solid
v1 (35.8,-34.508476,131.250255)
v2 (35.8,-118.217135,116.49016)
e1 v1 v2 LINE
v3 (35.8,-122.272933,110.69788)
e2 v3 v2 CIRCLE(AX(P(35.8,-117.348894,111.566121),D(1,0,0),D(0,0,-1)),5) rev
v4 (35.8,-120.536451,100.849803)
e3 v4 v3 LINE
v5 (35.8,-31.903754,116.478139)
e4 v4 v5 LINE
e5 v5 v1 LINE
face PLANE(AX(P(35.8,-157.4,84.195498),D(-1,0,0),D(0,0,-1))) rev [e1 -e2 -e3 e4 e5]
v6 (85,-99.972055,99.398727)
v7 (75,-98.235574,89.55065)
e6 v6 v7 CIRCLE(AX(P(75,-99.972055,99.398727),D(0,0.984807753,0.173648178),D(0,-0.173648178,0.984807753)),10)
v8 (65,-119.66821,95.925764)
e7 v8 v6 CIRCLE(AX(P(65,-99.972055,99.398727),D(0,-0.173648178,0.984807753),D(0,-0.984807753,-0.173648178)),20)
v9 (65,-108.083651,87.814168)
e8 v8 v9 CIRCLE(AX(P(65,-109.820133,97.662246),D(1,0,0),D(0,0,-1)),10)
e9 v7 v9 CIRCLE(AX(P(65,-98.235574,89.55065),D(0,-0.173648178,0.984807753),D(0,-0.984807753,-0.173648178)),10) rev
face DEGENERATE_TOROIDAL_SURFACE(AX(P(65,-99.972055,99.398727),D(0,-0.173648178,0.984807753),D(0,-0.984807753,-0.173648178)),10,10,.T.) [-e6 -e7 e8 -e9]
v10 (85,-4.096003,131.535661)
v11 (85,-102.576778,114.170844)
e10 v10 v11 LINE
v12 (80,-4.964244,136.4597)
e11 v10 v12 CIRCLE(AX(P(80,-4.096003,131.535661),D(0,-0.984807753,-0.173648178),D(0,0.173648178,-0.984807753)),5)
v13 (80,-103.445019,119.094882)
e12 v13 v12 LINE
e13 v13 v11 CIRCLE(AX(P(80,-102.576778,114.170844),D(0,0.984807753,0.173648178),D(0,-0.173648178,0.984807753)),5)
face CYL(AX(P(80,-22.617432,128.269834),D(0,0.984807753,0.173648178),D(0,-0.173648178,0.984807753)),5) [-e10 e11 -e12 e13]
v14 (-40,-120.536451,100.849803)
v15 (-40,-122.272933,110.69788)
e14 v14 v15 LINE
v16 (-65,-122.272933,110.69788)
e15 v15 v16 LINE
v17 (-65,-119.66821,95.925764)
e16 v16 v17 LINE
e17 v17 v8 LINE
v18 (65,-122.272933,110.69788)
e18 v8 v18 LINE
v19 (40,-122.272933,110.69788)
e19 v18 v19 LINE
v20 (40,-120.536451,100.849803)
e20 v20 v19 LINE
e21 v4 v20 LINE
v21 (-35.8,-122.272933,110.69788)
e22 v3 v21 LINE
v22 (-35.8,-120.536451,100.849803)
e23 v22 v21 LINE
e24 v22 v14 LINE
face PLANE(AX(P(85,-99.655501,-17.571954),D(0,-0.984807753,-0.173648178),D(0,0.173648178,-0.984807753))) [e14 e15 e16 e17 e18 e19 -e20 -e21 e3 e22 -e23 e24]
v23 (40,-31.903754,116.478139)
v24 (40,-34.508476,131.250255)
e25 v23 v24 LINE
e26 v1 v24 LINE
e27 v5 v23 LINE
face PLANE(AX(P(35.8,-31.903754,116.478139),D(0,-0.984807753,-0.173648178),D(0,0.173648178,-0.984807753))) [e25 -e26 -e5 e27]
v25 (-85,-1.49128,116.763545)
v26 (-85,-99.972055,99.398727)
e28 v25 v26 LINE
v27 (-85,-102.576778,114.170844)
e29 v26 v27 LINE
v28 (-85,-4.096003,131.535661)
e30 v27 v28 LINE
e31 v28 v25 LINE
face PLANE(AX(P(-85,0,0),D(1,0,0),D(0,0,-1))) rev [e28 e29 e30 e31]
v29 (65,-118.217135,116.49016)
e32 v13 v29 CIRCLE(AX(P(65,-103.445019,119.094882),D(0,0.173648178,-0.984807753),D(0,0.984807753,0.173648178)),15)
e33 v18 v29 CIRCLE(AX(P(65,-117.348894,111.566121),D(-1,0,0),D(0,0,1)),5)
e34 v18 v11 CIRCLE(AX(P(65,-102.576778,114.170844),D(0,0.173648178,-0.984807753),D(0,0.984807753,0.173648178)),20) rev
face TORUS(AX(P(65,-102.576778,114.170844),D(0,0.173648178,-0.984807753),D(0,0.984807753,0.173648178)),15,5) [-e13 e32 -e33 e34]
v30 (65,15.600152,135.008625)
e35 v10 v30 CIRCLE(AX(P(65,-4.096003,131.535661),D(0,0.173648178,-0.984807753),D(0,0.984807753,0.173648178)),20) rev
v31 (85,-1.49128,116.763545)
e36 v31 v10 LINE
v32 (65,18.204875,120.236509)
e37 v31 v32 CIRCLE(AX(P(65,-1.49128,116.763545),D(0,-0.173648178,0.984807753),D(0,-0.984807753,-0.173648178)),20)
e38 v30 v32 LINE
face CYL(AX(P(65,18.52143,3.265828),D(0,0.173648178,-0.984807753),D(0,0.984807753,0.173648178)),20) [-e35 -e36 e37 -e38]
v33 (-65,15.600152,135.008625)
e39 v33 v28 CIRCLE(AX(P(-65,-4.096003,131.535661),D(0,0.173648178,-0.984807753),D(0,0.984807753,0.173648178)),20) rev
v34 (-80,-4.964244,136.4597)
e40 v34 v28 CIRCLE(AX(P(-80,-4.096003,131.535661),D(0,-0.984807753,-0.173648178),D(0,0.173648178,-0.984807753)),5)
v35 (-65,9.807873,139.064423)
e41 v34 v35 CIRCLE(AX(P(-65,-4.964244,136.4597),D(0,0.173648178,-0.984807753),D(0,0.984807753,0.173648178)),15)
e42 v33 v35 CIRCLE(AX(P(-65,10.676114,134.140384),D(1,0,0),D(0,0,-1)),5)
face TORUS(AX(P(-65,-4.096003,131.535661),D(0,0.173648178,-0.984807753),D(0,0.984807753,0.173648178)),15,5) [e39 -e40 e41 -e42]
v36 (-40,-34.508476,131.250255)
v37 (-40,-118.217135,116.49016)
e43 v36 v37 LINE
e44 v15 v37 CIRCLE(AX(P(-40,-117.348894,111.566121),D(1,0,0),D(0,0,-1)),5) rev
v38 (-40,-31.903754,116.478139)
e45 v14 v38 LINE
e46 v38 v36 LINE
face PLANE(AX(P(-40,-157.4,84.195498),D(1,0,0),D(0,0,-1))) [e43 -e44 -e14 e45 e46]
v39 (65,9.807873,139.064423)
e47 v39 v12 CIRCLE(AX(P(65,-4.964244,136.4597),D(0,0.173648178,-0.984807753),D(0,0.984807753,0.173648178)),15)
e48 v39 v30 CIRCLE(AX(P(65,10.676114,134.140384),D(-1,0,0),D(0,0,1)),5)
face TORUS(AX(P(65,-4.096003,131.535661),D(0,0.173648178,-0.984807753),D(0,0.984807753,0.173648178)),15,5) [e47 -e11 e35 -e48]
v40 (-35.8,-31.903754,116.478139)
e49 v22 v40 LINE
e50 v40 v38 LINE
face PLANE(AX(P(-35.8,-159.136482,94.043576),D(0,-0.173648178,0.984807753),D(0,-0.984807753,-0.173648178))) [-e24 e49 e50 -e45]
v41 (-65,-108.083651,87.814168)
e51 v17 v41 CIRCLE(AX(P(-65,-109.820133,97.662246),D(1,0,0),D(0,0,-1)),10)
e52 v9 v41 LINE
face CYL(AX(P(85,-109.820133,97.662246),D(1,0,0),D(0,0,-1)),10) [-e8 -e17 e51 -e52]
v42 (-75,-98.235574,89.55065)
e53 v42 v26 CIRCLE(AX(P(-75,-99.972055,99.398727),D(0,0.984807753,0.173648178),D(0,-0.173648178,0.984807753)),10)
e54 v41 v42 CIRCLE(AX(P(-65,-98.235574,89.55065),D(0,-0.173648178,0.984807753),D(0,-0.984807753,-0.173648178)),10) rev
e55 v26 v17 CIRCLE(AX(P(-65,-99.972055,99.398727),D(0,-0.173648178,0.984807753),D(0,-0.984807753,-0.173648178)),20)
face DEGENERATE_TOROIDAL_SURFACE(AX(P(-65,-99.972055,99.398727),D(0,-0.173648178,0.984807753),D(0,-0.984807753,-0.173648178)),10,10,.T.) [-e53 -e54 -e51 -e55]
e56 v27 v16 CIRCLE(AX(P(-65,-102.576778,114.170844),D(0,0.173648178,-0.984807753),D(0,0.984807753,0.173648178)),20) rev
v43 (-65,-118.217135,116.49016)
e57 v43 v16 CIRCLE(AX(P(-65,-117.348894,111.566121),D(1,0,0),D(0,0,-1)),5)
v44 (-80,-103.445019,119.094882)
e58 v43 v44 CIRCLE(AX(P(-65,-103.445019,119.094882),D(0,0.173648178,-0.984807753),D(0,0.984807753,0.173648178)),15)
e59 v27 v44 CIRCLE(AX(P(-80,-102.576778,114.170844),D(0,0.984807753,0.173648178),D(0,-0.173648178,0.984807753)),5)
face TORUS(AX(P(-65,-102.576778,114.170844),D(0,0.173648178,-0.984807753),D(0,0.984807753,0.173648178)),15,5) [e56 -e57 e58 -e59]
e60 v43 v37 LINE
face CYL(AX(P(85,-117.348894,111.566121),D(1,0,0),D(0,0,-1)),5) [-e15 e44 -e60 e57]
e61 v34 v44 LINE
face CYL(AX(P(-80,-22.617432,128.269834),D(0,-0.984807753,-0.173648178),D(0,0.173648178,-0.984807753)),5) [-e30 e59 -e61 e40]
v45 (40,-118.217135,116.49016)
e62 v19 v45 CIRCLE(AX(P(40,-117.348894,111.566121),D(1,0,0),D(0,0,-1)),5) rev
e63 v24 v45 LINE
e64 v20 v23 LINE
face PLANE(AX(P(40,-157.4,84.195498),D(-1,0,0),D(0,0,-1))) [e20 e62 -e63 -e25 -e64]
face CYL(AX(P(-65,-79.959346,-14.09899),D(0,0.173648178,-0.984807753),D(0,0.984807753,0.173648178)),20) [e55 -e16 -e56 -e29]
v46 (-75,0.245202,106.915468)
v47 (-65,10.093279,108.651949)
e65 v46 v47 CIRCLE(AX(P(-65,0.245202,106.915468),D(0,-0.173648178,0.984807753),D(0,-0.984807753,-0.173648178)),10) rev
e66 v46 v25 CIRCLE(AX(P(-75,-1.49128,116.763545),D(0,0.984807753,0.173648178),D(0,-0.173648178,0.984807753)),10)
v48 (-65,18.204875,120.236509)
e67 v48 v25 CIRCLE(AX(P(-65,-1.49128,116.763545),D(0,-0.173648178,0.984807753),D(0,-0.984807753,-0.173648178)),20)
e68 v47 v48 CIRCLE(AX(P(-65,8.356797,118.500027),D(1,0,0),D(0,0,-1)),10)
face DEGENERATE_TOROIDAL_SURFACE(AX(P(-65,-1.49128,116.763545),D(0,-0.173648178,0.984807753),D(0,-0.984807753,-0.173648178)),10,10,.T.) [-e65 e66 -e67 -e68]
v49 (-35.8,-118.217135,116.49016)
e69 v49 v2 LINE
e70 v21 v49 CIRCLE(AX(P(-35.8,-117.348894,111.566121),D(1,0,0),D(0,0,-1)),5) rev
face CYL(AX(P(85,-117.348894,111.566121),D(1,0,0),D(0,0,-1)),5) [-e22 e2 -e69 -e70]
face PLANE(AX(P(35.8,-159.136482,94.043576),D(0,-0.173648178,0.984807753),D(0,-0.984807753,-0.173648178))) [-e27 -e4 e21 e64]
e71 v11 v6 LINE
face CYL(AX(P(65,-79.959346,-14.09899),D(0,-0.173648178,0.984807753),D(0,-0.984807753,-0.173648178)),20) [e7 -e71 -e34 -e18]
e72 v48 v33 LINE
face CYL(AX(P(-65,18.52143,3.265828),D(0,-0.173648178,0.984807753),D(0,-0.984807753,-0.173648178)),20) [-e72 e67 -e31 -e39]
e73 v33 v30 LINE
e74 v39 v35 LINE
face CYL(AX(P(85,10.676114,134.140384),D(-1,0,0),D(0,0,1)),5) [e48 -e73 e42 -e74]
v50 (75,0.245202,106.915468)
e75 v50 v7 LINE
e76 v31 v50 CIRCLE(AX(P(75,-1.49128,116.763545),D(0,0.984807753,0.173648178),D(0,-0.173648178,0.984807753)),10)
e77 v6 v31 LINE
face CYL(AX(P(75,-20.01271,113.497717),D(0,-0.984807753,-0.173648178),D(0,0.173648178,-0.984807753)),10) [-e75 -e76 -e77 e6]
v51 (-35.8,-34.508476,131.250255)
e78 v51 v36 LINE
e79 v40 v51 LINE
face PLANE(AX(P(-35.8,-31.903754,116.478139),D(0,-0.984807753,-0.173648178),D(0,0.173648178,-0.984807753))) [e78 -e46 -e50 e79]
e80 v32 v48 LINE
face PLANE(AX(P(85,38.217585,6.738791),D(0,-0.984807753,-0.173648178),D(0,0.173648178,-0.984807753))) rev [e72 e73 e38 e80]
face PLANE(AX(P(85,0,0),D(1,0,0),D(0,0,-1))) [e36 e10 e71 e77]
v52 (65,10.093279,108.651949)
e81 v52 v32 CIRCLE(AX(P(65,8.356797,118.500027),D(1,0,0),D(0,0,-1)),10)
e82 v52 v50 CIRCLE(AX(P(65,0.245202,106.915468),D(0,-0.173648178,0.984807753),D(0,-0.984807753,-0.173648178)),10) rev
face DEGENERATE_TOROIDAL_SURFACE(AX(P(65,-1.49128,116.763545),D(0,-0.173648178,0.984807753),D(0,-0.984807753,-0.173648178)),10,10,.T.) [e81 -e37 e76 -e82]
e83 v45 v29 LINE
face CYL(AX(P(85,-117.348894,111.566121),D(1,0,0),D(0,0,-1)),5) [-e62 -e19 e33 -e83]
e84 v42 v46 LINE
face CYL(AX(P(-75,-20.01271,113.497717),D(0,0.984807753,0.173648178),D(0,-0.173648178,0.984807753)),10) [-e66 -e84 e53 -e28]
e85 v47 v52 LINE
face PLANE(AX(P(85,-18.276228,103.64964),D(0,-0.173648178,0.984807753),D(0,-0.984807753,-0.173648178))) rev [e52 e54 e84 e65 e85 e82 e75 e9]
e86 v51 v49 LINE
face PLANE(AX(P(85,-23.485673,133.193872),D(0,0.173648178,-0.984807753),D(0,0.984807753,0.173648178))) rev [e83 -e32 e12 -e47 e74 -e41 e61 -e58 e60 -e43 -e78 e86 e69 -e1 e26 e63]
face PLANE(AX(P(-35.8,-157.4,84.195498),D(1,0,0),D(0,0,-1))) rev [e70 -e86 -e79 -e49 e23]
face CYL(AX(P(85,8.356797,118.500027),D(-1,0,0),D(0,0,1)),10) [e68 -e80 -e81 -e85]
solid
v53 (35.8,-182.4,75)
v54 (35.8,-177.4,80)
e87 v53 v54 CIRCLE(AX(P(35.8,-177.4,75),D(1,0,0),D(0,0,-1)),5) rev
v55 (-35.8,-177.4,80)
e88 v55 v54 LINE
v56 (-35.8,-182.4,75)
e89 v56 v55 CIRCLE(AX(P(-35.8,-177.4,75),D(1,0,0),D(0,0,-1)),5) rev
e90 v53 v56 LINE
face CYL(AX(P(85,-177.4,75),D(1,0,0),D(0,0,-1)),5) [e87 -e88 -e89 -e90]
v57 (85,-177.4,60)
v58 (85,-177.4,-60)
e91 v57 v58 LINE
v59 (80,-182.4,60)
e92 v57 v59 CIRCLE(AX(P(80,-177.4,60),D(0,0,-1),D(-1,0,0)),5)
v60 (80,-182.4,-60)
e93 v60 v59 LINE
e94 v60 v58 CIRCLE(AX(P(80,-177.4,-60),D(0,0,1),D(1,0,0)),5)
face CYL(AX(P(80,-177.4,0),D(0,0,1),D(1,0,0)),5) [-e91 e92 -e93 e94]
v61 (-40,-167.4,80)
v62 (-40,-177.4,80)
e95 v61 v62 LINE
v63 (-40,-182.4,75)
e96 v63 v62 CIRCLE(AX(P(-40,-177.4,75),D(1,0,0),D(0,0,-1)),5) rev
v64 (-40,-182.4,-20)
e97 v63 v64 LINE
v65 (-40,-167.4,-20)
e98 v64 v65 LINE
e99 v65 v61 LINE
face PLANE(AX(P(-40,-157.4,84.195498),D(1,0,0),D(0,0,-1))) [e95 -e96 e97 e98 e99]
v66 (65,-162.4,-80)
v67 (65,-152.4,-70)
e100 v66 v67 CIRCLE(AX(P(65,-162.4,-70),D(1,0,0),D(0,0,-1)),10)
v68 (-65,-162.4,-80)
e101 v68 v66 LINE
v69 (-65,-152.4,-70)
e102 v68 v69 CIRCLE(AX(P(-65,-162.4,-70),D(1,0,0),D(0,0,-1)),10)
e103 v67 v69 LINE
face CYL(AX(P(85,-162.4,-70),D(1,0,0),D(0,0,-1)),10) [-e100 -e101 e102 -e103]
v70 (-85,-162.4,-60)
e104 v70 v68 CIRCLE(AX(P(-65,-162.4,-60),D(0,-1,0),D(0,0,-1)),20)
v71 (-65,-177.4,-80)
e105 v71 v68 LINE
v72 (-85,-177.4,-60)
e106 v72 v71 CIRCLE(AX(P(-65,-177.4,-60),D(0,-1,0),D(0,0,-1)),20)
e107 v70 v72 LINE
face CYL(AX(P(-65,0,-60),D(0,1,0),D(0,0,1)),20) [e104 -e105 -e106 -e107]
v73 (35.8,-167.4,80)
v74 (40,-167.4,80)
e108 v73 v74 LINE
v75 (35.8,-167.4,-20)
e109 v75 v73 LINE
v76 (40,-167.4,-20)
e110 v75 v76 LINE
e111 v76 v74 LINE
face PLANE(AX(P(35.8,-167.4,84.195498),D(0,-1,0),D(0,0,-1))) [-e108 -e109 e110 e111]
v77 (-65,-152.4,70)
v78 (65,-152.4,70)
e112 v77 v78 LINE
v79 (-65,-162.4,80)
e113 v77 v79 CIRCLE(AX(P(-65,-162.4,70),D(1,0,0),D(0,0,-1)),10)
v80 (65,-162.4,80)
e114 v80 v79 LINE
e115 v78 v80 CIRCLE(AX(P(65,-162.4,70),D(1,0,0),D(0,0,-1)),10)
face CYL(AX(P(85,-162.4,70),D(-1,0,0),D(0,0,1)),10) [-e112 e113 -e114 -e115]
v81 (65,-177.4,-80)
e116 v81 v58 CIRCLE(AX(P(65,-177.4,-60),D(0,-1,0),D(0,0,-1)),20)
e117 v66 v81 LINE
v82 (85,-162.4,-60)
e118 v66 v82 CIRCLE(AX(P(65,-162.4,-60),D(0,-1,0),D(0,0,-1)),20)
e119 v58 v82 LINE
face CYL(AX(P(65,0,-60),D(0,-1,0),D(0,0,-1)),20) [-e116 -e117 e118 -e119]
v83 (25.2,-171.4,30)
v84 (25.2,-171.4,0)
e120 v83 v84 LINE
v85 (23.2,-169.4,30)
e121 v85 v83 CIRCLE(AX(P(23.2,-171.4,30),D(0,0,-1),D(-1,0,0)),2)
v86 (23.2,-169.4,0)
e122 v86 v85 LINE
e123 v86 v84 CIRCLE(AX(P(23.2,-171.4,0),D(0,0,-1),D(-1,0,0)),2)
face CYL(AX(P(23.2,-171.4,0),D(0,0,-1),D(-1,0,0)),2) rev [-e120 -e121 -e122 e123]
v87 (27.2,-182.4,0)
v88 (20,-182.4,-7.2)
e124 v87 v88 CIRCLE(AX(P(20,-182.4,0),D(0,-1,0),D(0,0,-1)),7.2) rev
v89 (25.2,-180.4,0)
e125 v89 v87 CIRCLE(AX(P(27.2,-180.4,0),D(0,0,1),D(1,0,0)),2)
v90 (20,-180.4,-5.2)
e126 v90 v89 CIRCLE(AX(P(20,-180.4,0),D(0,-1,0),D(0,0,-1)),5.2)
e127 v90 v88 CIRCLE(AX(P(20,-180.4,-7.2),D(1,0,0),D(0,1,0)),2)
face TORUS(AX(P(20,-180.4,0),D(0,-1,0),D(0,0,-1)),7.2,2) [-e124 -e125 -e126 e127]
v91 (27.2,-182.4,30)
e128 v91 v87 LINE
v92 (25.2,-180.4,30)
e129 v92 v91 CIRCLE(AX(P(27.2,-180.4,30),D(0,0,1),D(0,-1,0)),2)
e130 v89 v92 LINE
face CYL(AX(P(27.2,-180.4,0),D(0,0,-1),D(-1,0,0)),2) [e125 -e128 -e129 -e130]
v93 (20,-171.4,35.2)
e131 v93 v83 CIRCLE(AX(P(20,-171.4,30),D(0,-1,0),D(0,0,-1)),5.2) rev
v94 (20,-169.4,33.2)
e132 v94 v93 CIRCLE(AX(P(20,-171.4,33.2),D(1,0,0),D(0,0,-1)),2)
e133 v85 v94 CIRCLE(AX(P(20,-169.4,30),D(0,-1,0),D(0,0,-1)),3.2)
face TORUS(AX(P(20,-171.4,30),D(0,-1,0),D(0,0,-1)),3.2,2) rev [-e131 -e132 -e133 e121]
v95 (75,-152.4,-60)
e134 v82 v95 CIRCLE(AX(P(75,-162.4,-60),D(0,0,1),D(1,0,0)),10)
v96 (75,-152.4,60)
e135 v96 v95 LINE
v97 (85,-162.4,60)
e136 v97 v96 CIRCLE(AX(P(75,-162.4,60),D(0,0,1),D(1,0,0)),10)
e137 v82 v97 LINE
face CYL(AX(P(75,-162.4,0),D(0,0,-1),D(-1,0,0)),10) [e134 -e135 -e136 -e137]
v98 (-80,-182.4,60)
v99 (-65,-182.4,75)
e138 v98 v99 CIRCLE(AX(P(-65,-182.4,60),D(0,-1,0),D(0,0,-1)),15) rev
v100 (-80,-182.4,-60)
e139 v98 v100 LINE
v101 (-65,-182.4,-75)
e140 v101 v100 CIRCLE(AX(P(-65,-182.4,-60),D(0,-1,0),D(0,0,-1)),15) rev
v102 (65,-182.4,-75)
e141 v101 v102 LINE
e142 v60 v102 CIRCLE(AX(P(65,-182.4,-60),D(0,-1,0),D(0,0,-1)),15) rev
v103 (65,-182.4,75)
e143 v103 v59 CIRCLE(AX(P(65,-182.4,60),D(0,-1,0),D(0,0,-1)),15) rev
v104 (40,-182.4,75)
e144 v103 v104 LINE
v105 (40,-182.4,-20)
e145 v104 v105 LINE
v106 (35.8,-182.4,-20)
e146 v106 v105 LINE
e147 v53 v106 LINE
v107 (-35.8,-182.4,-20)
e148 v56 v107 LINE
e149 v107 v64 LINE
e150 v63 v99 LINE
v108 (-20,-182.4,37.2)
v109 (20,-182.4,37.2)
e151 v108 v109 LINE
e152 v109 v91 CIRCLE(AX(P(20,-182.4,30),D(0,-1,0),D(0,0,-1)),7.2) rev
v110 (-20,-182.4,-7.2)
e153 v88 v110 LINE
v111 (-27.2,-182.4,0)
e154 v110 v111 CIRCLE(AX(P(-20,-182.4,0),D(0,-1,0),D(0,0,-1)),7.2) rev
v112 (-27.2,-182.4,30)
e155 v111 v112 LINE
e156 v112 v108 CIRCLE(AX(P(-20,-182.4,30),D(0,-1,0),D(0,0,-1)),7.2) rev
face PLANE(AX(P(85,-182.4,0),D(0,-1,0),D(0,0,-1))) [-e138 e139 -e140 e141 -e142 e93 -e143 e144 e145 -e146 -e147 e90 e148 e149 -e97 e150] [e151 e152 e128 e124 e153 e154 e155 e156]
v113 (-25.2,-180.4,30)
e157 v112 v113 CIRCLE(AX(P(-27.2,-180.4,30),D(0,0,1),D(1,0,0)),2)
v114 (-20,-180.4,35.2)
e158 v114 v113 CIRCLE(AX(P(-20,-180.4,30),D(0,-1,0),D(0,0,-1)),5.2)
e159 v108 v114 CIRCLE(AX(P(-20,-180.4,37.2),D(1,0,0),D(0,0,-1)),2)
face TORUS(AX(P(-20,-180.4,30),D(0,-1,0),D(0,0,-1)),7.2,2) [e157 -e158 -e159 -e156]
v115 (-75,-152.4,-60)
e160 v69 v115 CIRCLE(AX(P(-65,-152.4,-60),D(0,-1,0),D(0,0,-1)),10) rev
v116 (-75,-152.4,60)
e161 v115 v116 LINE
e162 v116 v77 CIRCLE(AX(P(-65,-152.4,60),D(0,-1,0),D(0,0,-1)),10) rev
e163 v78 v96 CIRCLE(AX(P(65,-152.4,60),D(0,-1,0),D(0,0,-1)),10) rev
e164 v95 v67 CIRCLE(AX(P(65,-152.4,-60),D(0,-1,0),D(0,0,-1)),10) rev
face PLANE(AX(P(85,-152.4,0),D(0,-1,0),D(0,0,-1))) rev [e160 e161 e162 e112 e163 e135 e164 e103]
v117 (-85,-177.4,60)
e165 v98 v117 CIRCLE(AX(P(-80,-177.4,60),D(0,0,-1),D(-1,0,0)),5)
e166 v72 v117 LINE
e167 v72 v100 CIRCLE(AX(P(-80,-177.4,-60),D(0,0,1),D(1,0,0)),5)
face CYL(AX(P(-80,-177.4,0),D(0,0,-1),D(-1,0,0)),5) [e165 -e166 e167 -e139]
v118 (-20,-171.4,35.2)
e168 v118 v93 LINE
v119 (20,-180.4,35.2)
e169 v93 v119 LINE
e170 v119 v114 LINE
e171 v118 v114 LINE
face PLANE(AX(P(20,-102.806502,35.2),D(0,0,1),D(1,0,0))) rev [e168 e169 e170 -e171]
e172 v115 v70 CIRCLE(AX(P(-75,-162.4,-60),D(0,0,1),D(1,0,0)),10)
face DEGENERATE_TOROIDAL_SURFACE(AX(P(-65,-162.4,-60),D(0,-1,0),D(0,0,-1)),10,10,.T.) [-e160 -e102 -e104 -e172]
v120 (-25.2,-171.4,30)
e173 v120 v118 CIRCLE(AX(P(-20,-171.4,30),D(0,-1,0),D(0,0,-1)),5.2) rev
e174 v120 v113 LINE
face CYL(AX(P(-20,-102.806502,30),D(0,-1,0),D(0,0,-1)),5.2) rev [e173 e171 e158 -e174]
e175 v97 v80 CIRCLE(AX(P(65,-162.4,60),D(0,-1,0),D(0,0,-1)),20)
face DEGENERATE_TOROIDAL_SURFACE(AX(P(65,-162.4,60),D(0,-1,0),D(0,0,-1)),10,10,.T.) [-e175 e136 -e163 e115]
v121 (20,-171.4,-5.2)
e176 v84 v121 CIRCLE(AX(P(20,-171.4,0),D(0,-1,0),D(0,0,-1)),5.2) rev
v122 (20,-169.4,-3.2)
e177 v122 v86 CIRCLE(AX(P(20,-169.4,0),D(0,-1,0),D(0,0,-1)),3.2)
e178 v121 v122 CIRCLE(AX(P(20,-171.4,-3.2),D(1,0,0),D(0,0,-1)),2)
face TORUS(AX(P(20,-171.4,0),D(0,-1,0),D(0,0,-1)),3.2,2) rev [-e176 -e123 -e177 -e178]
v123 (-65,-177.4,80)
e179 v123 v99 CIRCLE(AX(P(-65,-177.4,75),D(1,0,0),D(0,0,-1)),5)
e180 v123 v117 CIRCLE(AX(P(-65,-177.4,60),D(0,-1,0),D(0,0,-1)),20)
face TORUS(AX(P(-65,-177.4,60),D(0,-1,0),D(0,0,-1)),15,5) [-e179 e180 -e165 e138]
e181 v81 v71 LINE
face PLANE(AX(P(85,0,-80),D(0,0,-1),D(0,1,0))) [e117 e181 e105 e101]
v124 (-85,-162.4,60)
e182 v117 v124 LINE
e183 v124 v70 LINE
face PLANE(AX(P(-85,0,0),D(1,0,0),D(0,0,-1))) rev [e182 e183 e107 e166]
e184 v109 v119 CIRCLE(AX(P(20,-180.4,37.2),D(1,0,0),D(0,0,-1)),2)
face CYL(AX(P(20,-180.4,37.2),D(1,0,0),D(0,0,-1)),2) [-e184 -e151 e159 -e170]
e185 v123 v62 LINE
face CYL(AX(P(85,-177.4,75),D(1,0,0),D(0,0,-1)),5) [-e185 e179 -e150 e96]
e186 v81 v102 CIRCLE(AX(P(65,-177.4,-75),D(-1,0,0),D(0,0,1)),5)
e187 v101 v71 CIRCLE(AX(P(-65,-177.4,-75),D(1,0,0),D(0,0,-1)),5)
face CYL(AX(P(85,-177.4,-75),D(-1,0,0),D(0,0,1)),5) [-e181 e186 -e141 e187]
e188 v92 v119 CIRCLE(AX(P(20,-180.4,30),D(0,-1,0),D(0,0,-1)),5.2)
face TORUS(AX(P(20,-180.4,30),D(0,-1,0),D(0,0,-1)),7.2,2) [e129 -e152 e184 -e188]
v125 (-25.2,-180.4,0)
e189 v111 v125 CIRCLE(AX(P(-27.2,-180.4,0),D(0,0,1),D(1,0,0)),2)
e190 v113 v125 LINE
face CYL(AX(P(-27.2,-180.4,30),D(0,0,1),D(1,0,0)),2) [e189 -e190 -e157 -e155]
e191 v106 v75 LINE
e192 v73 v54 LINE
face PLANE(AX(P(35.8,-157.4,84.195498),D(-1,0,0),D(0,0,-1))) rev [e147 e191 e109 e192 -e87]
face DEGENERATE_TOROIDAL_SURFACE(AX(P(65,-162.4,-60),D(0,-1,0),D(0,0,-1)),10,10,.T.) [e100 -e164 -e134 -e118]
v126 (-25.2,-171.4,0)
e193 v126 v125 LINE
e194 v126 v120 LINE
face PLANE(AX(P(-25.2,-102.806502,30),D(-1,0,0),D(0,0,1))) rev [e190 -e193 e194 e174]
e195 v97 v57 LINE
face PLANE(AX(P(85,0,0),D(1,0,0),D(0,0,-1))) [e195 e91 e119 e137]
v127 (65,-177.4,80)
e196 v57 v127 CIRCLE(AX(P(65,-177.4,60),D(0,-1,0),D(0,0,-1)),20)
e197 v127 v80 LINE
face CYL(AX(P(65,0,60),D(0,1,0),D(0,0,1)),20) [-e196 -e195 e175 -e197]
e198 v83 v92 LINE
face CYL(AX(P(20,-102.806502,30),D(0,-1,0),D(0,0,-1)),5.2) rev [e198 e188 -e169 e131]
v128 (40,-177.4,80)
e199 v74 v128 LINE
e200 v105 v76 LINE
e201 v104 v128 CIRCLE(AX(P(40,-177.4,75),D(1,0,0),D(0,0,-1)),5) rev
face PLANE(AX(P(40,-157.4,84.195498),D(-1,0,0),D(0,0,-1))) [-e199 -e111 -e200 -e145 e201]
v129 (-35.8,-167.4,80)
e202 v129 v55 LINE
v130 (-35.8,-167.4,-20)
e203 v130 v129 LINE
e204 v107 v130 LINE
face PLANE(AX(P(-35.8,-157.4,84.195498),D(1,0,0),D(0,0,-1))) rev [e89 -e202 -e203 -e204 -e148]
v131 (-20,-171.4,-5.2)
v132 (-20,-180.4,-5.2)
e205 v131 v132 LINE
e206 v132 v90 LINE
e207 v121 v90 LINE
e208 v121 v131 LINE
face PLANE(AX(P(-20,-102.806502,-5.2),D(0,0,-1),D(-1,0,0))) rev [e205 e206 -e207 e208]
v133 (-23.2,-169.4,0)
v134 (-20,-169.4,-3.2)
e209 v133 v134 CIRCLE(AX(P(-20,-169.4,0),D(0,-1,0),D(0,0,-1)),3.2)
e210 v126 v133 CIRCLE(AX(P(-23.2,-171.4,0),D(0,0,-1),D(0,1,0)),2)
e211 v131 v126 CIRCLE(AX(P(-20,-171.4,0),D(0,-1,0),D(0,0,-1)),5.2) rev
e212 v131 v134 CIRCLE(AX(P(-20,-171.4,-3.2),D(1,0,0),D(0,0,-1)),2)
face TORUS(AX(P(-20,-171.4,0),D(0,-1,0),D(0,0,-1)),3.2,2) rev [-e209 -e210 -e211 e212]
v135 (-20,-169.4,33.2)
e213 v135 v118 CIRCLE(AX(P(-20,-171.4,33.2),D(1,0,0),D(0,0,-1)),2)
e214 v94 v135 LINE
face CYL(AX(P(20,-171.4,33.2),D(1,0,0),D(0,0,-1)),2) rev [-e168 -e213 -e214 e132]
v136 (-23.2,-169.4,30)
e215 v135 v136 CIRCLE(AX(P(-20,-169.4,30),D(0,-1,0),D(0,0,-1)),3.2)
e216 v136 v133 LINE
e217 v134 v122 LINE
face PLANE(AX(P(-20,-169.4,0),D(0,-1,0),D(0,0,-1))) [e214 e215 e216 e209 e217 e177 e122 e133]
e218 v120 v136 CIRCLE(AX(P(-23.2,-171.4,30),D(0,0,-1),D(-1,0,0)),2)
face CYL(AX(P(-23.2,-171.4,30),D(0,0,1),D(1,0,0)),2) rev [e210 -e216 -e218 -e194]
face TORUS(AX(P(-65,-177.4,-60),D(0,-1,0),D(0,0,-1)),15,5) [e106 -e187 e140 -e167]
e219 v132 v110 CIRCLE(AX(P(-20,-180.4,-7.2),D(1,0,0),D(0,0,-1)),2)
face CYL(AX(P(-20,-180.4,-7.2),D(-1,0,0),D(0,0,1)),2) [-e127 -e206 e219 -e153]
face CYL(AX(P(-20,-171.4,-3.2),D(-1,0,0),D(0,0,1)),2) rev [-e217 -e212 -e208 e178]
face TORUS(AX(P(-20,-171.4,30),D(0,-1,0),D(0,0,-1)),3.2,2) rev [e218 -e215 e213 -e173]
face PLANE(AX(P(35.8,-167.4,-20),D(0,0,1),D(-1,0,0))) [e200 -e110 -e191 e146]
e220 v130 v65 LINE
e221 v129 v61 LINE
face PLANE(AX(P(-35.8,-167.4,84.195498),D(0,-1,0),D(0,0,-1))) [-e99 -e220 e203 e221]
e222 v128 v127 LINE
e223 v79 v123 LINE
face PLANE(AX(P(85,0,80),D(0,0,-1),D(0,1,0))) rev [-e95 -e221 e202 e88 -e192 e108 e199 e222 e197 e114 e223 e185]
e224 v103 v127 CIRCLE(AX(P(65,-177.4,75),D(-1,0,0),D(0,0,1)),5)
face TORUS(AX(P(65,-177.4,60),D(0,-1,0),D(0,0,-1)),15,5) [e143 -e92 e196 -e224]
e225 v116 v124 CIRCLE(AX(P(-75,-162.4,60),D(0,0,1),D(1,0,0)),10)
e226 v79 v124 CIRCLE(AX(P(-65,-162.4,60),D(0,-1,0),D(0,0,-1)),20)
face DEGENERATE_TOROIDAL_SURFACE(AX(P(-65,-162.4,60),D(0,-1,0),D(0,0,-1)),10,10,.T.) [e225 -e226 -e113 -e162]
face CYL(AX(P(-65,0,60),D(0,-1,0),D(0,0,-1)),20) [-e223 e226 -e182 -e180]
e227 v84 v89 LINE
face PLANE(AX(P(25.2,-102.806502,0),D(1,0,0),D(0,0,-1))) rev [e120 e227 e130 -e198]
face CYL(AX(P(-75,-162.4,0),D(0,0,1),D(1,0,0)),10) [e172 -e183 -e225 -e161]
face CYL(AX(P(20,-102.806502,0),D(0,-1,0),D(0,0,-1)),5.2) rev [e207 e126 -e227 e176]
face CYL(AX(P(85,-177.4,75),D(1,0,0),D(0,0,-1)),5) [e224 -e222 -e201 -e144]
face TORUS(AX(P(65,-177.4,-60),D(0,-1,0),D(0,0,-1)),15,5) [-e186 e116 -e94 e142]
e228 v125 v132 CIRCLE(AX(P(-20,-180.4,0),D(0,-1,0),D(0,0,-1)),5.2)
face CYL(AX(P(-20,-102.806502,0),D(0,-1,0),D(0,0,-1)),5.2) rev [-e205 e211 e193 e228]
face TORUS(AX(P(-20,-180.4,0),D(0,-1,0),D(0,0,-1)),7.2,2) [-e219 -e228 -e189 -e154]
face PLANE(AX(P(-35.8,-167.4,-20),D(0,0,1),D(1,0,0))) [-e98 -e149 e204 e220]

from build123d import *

# Parameters (mm, degrees)
SKETCH1_W           = 160
SKETCH1_H           = 30
BOSS_EXTRUDE1_DEPTH = 85
FILLET5_R           = 5
FILLET6_R           = 5
CUT_EXTRUDE1_START  = -40
CUT_EXTRUDE1_DEPTH  = 4.2
FILLET1_R           = 20
FILLET2_R           = 20
FILLET3_R           = 10
FILLET4_R           = 10
CUT_EXTRUDE3_DEPTH  = 13
FILLET7_R           = 2


with BuildPart() as part:
    # Sketch1 → Boss-Extrude1 (new, symmetric)
    with BuildSketch(Plane(origin=(0, 0, 0), x_dir=(0, 0, -1), z_dir=(1, 0, 0))):
        with Locations((0, -167.4)):
            Rectangle(SKETCH1_W, SKETCH1_H)
        Polygon((-136.5722642, -4.325861041), (-131.250254799, -34.508476203), (-116.478138504, -31.903753538), (-100.849802514, -120.53645131), (-86.077686218, -117.931728645), (-110.388431092, 19.941356777), (-139.932663682, 14.731911447), align=None)
        Polygon((-131.250254799, -34.508476203), (-115.621918809, -123.141173975), (-100.849802514, -120.53645131), (-116.478138504, -31.903753538), align=None)
    extrude(amount=BOSS_EXTRUDE1_DEPTH, both=True)

    # Fillet5
    fillet5_edges = [part.edges().sort_by_distance(p)[0] for p in [
        (0, -123.141173975, 115.621918809),
        (85, -54.204631264, 127.777291245),
        (-85, -54.204631264, 127.777291245),
        (0, 14.731911447, 139.932663682),
    ]]
    fillet(fillet5_edges, radius=FILLET5_R)

    # Fillet6
    fillet6_edges = [part.edges().sort_by_distance(p)[0] for p in [
        (85, -182.4, 0),
        (-85, -182.4, 0),
        (0, -182.4, 80),
        (0, -182.4, -80),
    ]]
    fillet(fillet6_edges, radius=FILLET6_R)

    # Sketch2 → Cut-Extrude1 (cut)
    with BuildSketch(Plane(origin=(0, 0, 0), x_dir=(0, 0, -1), z_dir=(1, 0, 0)).offset(CUT_EXTRUDE1_START)):
        with BuildLine():
            Line((-131.250254799, -34.508476203), (-108.815691981, -161.741204442))
            ThreePointArc((-108.815691981, -161.741204442), (-100.265188398, -176.551111078), (-84.195498156, -182.4))
            Line((-84.195498156, -182.4), (-80, -182.4))
            Line((-80, -182.4), (20, -182.4))
            Line((20, -182.4), (20, -167.4))
            Line((20, -167.4), (-80, -167.4))
            Line((-80, -167.4), (-84.195498156, -167.4))
            ThreePointArc((-84.195498156, -167.4), (-90.623374253, -165.060444431), (-94.043575686, -159.136481777))
            Line((-94.043575686, -159.136481777), (-116.478138504, -31.903753538))
            Line((-116.478138504, -31.903753538), (-131.250254799, -34.508476203))
        make_face()
    cut_extrude1 = extrude(amount=CUT_EXTRUDE1_DEPTH, mode=Mode.SUBTRACT)

    # Mirror1: Cut-Extrude1 across plane
    add(cut_extrude1.mirror(Plane(origin=(0, 0, 0), x_dir=(0, 0, 1), z_dir=(1, 0, 0))), mode=Mode.SUBTRACT)

    # Fillet1
    # the kernel refuses this fillet: 20 mm, written as the material it takes off along each edge
    with BuildSketch(Plane(origin=(65, -182.4, -60), x_dir=(0, 0, -1), z_dir=(-1, 0, 0))) as fillet1_piece_1:
        with BuildLine():
            CenterArc((15, -5), 5, 0, 90)
            Line((20, -5), (20, 0))
            Line((20, 0), (15, 0))
        make_face()
    revolve(axis=Axis((65, -182.4, -60), (0, -1, 0)), revolution_arc=90, mode=Mode.SUBTRACT)
    with BuildSketch(Plane(origin=(-65, -182.4, -60), x_dir=(-1, 0, 0), z_dir=(0, 0, 1))) as fillet1_piece_2:
        with BuildLine():
            CenterArc((15, -5), 5, 0, 90)
            Line((20, -5), (20, 0))
            Line((20, 0), (15, 0))
        make_face()
    revolve(axis=Axis((-65, -182.4, -60), (0, -1, 0)), revolution_arc=90, mode=Mode.SUBTRACT)
    with BuildSketch(Plane(origin=(65, -182.4, 60), x_dir=(1, 0, 0), z_dir=(0, 0, -1))) as fillet1_piece_3:
        with BuildLine():
            CenterArc((15, -5), 5, 0, 90)
            Line((20, -5), (20, 0))
            Line((20, 0), (15, 0))
        make_face()
    revolve(axis=Axis((65, -182.4, 60), (0, -1, 0)), revolution_arc=90, mode=Mode.SUBTRACT)
    with BuildSketch(Plane(origin=(-65, -182.4, 60), x_dir=(0, 0, 1), z_dir=(1, 0, 0))) as fillet1_piece_4:
        with BuildLine():
            CenterArc((15, -5), 5, 0, 90)
            Line((20, -5), (20, 0))
            Line((20, 0), (15, 0))
        make_face()
    revolve(axis=Axis((-65, -182.4, 60), (0, -1, 0)), revolution_arc=90, mode=Mode.SUBTRACT)
    with BuildSketch(Plane(origin=(85, -102.4, -80), x_dir=(0, 0, 1), z_dir=(0, -1, 0)), Plane(origin=(85, -182.4, 80), x_dir=(0, 0, -1), z_dir=(0, 1, 0)), Plane(origin=(-85, -182.4, 80), x_dir=(1, 0, 0), z_dir=(0, 1, 0))) as fillet1_piece_5:
        with BuildLine():
            CenterArc((FILLET1_R, FILLET1_R), FILLET1_R, 180, 90)
            Line((0, FILLET1_R), (0, 0))
            Line((0, 0), (FILLET1_R, 0))
        make_face()
    extrude(amount=80, mode=Mode.SUBTRACT)
    with BuildSketch(Plane(origin=(-85, -102.4, -80), x_dir=(0, 0, 1), z_dir=(0, -1, 0))) as fillet1_piece_6:
        with BuildLine():
            CenterArc((FILLET1_R, -FILLET1_R), FILLET1_R, 90, 90)
            Line((0, -FILLET1_R), (0, 0))
            Line((0, 0), (FILLET1_R, 0))
        make_face()
    extrude(amount=80, mode=Mode.SUBTRACT)

    # Fillet2
    # the kernel refuses this fillet: 20 mm, written as the material it takes off along each edge
    with BuildSketch(Plane(origin=(65, -103.445018914, 119.094882362), x_dir=(0, -0.9848077530122086, -0.17364817766692728), z_dir=(-1, 0, 0))) as fillet2_piece_1:
        with BuildLine():
            CenterArc((15, -5), 5, 0, 90)
            Line((20, -5), (20, 0))
            Line((20, 0), (15, 0))
        make_face()
    revolve(axis=Axis((65, -103.445018914, 119.094882362), (0, -0.17364817766692778, 0.9848077530122086)), revolution_arc=90, mode=Mode.SUBTRACT)
    with BuildSketch(Plane(origin=(-65, -103.445018914, 119.094882362), x_dir=(-1, 0, 0), z_dir=(0, 0.9848077530122086, 0.17364817766692778))) as fillet2_piece_2:
        with BuildLine():
            CenterArc((15, -5), 5, 0, 90)
            Line((20, -5), (20, 0))
            Line((20, 0), (15, 0))
        make_face()
    revolve(axis=Axis((-65, -103.445018914, 119.094882362), (0, -0.17364817766692778, 0.9848077530122086)), revolution_arc=90, mode=Mode.SUBTRACT)
    with BuildSketch(Plane(origin=(65, -4.964243613, 136.459700129), x_dir=(1, 0, 0), z_dir=(0, -0.9848077530122086, -0.17364817766692778))) as fillet2_piece_3:
        with BuildLine():
            CenterArc((15, -5), 5, 0, 90)
            Line((20, -5), (20, 0))
            Line((20, 0), (15, 0))
        make_face()
    revolve(axis=Axis((65, -4.964243613, 136.459700129), (0, -0.17364817766692778, 0.9848077530122086)), revolution_arc=90, mode=Mode.SUBTRACT)
    with BuildSketch(Plane(origin=(-65, -4.964243613, 136.459700129), x_dir=(0, 0.9848077530122086, 0.17364817766692744), z_dir=(1, 0, 0))) as fillet2_piece_4:
        with BuildLine():
            CenterArc((15, -5), 5, 0, 90)
            Line((20, -5), (20, 0))
            Line((20, 0), (15, 0))
        make_face()
    revolve(axis=Axis((-65, -4.964243613, 136.459700129), (0, -0.17364817766692778, 0.9848077530122086)), revolution_arc=90, mode=Mode.SUBTRACT)
    with BuildSketch(Plane(origin=(85, -123.141173975, 115.621918809), x_dir=(0, 0.9848077530122087, 0.17364817766692744), z_dir=(0, 0.17364817766692744, -0.9848077530122086)), Plane(origin=(-85, 28.62376566, 61.148043441), x_dir=(1, 0, 0), z_dir=(0, -0.17364817766692744, 0.9848077530122086))) as fillet2_piece_5:
        with BuildLine():
            CenterArc((FILLET2_R, -FILLET2_R), FILLET2_R, 90, 90)
            Line((0, -FILLET2_R), (0, 0))
            Line((0, 0), (FILLET2_R, 0))
        make_face()
    extrude(amount=80, mode=Mode.SUBTRACT)
    with BuildSketch(Plane(origin=(85, 28.62376566, 61.148043441), x_dir=(-1, 0, 0), z_dir=(0, -0.17364817766692744, 0.9848077530122086)), Plane(origin=(-85, -109.249319761, 36.837298568), x_dir=(1, 0, 0), z_dir=(0, -0.17364817766692744, 0.9848077530122086))) as fillet2_piece_6:
        with BuildLine():
            CenterArc((FILLET2_R, FILLET2_R), FILLET2_R, 180, 90)
            Line((0, FILLET2_R), (0, 0))
            Line((0, 0), (FILLET2_R, 0))
        make_face()
    extrude(amount=80, mode=Mode.SUBTRACT)

    # Fillet3
    fillet3_edges = [part.edges().sort_by_distance(p)[0] for p in [
        (0, 19.941356777, 110.388431092),
        (-79.142135624, 14.172486523, 109.371223618),
        (-79.142135624, -112.162858391, 87.094893692),
        (79.142135624, 14.172486523, 109.371223618),
        (79.142135624, -112.162858391, 87.094893692),
        (0, -117.931728645, 86.077686218),
        (85, -48.995185934, 98.233058655),
        (-85, -48.995185934, 98.233058655),
    ]]
    fillet(fillet3_edges, radius=FILLET3_R)

    # Fillet4
    fillet4_edges = [part.edges().sort_by_distance(p)[0] for p in [
        (79.142135624, -152.4, -74.142135624),
        (0, -152.4, -80),
        (85, -152.4, 0),
        (-85, -152.4, 0),
        (0, -152.4, 80),
        (-79.142135624, -152.4, -74.142135624),
        (-79.142135624, -152.4, 74.142135624),
        (79.142135624, -152.4, 74.142135624),
    ]]
    fillet(fillet4_edges, radius=FILLET4_R)

    # Sketch3 → Cut-Extrude3 (cut)
    with BuildSketch(Plane.XZ.offset(182.4)):
        with BuildLine():
            Line((-25.2, 30), (-25.2, 0))
            ThreePointArc((-25.2, 0), (-23.676955262, -3.676955262), (-20, -5.2))
            Line((-20, -5.2), (20, -5.2))
            ThreePointArc((20, -5.2), (23.676955262, -3.676955262), (25.2, 0))
            Line((25.2, 0), (25.2, 30))
            ThreePointArc((25.2, 30), (23.676955262, 33.676955262), (20, 35.2))
            Line((20, 35.2), (-20, 35.2))
            ThreePointArc((-20, 35.2), (-23.676955262, 33.676955262), (-25.2, 30))
        make_face()
    extrude(amount=-CUT_EXTRUDE3_DEPTH, mode=Mode.SUBTRACT)

    # Fillet7
    fillet7_edges = [part.edges().sort_by_distance(p)[0] for p in [
        (-23.676955262, -182.4, 33.676955262),
        (-25.2, -182.4, 15),
        (-23.676955262, -182.4, -3.676955262),
        (0, -182.4, -5.2),
        (23.676955262, -182.4, -3.676955262),
        (25.2, -182.4, 15),
        (23.676955262, -182.4, 33.676955262),
        (0, -182.4, 35.2),
        (-23.676955262, -169.4, 33.676955262),
        (0, -169.4, 35.2),
        (23.676955262, -169.4, 33.676955262),
        (25.2, -169.4, 15),
        (23.676955262, -169.4, -3.676955262),
        (0, -169.4, -5.2),
        (-23.676955262, -169.4, -3.676955262),
        (-25.2, -169.4, 15),
    ]]
    fillet(fillet7_edges, radius=FILLET7_R)


solid = part.part
